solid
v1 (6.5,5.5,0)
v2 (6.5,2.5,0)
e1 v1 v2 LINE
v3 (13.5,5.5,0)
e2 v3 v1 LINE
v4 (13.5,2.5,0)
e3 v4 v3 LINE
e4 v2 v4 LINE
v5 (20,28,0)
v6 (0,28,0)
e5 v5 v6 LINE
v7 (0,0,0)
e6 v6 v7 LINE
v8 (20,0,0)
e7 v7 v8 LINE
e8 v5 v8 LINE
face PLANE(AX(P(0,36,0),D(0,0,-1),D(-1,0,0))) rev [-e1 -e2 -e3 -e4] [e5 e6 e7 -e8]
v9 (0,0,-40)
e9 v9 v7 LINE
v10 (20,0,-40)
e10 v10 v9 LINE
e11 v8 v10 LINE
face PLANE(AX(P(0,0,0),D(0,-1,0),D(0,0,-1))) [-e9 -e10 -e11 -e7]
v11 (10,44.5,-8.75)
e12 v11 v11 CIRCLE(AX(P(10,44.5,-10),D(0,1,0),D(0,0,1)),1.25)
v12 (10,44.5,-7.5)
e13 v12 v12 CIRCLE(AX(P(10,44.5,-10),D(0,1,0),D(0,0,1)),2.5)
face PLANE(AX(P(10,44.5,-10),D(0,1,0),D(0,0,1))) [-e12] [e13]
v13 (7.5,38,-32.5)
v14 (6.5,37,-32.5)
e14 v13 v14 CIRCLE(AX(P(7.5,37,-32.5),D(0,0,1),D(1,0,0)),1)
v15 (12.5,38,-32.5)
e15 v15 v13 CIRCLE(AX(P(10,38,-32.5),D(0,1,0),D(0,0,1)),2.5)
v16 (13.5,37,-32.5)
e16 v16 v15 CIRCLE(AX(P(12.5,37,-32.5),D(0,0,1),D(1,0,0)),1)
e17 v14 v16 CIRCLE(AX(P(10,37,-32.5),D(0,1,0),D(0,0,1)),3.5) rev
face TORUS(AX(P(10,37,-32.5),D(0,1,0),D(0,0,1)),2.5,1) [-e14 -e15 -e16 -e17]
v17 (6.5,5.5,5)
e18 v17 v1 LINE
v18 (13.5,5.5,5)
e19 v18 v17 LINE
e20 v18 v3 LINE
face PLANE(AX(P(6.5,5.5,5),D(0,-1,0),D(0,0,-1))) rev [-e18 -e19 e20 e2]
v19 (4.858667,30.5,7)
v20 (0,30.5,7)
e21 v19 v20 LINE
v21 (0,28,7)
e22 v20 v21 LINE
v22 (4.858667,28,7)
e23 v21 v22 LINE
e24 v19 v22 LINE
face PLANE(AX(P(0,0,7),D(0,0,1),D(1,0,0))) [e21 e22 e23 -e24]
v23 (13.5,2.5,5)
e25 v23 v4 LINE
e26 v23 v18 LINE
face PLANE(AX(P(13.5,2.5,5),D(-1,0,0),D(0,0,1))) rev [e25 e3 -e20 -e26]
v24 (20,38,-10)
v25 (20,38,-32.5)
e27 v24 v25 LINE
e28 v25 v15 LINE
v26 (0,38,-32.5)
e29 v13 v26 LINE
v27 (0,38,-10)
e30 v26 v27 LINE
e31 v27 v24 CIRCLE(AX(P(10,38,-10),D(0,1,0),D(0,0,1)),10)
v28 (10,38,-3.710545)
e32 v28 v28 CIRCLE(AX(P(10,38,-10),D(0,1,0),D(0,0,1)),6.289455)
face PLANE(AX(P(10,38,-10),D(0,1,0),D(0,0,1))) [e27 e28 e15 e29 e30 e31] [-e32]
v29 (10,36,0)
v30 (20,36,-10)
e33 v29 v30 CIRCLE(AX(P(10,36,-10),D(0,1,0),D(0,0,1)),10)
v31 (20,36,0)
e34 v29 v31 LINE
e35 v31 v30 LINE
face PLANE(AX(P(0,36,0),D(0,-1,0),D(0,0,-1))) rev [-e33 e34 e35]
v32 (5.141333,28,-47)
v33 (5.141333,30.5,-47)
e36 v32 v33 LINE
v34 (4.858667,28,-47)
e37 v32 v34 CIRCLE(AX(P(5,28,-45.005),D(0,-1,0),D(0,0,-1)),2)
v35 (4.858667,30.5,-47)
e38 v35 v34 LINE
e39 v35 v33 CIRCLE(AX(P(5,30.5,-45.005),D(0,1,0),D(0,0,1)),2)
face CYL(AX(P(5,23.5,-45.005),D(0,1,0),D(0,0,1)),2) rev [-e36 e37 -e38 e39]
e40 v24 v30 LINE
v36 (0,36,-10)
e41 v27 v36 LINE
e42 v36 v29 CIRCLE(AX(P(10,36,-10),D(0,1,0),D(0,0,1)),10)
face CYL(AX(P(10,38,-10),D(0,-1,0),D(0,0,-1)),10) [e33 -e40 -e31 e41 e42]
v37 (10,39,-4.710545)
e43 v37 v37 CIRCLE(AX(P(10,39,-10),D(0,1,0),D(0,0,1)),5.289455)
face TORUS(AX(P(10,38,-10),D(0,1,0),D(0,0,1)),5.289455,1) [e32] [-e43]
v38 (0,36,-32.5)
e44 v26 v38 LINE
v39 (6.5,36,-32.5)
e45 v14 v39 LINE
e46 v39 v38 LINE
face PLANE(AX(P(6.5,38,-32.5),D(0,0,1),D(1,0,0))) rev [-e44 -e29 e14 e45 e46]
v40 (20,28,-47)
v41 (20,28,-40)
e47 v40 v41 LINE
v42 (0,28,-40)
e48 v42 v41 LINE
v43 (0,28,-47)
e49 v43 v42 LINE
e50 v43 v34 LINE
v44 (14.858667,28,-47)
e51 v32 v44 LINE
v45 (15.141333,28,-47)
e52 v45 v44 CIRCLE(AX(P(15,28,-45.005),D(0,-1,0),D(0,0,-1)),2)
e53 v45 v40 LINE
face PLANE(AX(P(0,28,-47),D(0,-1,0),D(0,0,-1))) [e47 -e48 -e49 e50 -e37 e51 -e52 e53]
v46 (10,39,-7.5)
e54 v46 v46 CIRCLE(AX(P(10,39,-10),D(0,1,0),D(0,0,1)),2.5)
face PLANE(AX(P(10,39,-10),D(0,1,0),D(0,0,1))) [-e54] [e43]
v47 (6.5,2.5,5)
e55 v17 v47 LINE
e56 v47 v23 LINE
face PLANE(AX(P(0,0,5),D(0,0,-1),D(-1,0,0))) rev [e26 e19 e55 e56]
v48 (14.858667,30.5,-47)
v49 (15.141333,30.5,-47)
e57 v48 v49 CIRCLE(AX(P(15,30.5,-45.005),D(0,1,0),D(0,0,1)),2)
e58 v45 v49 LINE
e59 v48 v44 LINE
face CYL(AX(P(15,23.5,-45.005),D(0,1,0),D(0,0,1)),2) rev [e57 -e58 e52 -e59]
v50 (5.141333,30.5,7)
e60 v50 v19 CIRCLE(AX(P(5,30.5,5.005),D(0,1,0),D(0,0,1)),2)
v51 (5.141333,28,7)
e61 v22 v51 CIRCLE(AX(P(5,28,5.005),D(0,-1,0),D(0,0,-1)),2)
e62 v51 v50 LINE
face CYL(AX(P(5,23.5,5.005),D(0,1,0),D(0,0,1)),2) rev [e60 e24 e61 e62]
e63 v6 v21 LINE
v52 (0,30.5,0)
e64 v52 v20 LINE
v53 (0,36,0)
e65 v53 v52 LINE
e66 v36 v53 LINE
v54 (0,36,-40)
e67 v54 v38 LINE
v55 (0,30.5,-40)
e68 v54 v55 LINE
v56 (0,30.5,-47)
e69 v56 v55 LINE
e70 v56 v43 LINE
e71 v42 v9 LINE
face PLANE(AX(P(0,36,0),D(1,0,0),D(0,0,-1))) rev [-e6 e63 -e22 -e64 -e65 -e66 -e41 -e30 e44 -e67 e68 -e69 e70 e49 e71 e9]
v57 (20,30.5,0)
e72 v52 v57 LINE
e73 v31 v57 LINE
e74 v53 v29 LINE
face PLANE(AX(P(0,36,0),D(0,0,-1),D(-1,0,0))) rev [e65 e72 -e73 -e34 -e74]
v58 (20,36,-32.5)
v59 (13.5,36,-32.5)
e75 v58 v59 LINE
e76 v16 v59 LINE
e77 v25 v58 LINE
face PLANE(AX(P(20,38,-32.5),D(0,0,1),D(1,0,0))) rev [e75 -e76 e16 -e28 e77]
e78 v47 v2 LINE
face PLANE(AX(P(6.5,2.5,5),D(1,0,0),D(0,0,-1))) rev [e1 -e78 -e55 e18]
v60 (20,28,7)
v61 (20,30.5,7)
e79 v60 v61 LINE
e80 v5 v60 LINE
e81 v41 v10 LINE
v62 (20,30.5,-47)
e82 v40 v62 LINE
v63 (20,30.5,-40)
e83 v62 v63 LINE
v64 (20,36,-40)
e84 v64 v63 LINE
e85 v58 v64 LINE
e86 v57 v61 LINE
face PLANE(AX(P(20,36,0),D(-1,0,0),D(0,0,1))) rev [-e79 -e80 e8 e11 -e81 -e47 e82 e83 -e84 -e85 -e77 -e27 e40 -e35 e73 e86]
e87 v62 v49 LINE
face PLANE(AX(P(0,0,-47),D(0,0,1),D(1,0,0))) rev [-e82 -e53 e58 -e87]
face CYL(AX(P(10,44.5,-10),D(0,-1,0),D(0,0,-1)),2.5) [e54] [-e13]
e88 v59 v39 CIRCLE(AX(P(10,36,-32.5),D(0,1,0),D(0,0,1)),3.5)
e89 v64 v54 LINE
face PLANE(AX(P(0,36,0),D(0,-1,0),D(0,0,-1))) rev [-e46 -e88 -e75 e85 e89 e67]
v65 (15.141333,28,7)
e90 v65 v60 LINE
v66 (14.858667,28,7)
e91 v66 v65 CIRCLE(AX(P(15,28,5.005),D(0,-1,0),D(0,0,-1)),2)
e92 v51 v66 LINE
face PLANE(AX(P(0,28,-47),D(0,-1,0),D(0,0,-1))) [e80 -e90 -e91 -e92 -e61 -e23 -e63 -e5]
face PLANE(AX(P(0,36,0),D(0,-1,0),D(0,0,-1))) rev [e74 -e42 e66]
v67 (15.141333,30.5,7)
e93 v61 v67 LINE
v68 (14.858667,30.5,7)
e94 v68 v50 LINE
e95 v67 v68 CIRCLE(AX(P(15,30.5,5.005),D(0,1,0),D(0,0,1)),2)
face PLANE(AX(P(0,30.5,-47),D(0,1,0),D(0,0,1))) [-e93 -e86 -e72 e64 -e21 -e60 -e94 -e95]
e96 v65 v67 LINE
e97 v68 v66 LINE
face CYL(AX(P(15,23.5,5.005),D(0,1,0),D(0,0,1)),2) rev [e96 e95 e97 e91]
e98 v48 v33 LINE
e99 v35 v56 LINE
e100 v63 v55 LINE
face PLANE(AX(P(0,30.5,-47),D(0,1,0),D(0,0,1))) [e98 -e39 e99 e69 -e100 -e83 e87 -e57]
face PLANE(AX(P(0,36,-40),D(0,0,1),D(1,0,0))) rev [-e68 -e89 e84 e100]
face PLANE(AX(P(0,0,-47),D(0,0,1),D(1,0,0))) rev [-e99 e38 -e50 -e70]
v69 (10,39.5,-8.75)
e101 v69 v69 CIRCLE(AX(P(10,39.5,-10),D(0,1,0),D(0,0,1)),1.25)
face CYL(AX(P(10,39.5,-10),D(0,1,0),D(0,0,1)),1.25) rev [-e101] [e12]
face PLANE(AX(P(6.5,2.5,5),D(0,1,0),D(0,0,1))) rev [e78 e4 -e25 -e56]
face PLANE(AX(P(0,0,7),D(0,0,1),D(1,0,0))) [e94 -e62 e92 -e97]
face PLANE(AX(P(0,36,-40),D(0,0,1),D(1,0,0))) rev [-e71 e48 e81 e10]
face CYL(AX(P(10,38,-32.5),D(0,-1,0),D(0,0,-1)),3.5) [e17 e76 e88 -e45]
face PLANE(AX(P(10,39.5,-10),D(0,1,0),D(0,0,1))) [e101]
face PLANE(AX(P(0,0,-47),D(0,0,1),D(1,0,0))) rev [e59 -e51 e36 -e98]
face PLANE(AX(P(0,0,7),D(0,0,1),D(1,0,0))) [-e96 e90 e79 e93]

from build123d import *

# Parameters (mm, degrees)
SKETCH1_W                = 20
SKETCH1_H                = 40
BOSS_EXTRUDE1_DEPTH      = 36
SKETCH2_W                = 7
SKETCH2_H                = 3
BOSS_EXTRUDE2_DEPTH      = 5
SKETCH3_R                = 2.5
BOSS_EXTRUDE3_DEPTH      = 8.5
BOSS_EXTRUDE4_DEPTH      = 7
BOSS_EXTRUDE4_DEPTH_BACK = 47
SKETCH4_W                = 20
SKETCH4_H                = 2.5
SKETCH5_R                = 2
CUT_EXTRUDE1_DEPTH       = 7
BOSS_EXTRUDE5_DEPTH      = 2
SKETCH7_R                = 6.289454611
BOSS_EXTRUDE6_DEPTH      = 1
FILLET1_R                = 1
FILLET2_R                = 1
SKETCH8_R                = 1.25
CUT_EXTRUDE2_DEPTH       = 5


with BuildPart() as part:
    # Sketch1 → Boss-Extrude1 (new body)
    with BuildSketch(Plane(origin=(0, 0, 0), x_dir=(1, 0, 0), z_dir=(0, 1, 0))):
        with Locations((10, 20)):
            Rectangle(SKETCH1_W, SKETCH1_H)
    extrude(amount=BOSS_EXTRUDE1_DEPTH)

    # Sketch2 → Boss-Extrude2 (add)
    with BuildSketch(Plane.XY):
        with Locations((10, 4)):
            Rectangle(SKETCH2_W, SKETCH2_H)
    extrude(amount=BOSS_EXTRUDE2_DEPTH)

    # Sketch3 → Boss-Extrude3 (add)
    with BuildSketch(Plane(origin=(0, 36, 0), x_dir=(1, 0, 0), z_dir=(0, 1, 0))):
        with Locations(Location((10, 10, 0), (0, 0, 90))):
            Circle(SKETCH3_R)
    extrude(amount=BOSS_EXTRUDE3_DEPTH)

    # Sketch4 → Boss-Extrude4 (add, two sides: drawn at the far end of the back side and taken through both)
    with BuildSketch(Plane.XY.offset(-BOSS_EXTRUDE4_DEPTH_BACK)):
        with Locations((10, 29.25)):
            Rectangle(SKETCH4_W, SKETCH4_H)
    extrude(amount=BOSS_EXTRUDE4_DEPTH + BOSS_EXTRUDE4_DEPTH_BACK)

    # Sketch5 → Cut-Extrude1 (cut)
    with BuildSketch(Plane(origin=(0, 30.5, 0), x_dir=(1, 0, 0), z_dir=(0, 1, 0))):
        with Locations((15, 45.005)):
            Circle(SKETCH5_R)
        with Locations((5, 45.005)):
            Circle(SKETCH5_R)
        with Locations((15, -5.005)):
            Circle(SKETCH5_R)
        with Locations((5, -5.005)):
            Circle(SKETCH5_R)
    extrude(amount=-CUT_EXTRUDE1_DEPTH, mode=Mode.SUBTRACT)

    # Sketch6 → Boss-Extrude5 (add)
    with BuildSketch(Plane(origin=(0, 36, 0), x_dir=(1, 0, 0), z_dir=(0, 1, 0))):
        with BuildLine():
            Line((20, 32.5), (13.5, 32.5))
            ThreePointArc((13.5, 32.5), (10, 36), (6.5, 32.5))
            Line((6.5, 32.5), (0, 32.5))
            Line((0, 32.5), (0, 10))
            ThreePointArc((0, 10), (10, 0), (20, 10))
            Line((20, 10), (20, 32.5))
        make_face()
    extrude(amount=BOSS_EXTRUDE5_DEPTH)

    # Sketch7 → Boss-Extrude6 (add)
    with BuildSketch(Plane(origin=(0, 38, 0), x_dir=(1, 0, 0), z_dir=(0, 1, 0))):
        with Locations(Location((10, 10, 0), (0, 0, 270))):
            Circle(SKETCH7_R)
    extrude(amount=BOSS_EXTRUDE6_DEPTH)

    # Fillet1
    fillet1_edges = [part.edges().sort_by_distance(p)[0] for p in [
        (10, 39, -16.289454611),
    ]]
    fillet(fillet1_edges, radius=FILLET1_R - 0.0001)  # a hair under: the kernel refuses the full size

    # Fillet2
    fillet2_edges = [part.edges().sort_by_distance(p)[0] for p in [
        (10, 38, -36),
    ]]
    fillet(fillet2_edges, radius=FILLET2_R)

    # Sketch8 → Cut-Extrude2 (cut)
    with BuildSketch(Plane(origin=(0, 44.5, 0), x_dir=(1, 0, 0), z_dir=(0, 1, 0))):
        with Locations(Location((10, 10, 0), (0, 0, 270))):
            Circle(SKETCH8_R)
    extrude(amount=-CUT_EXTRUDE2_DEPTH, mode=Mode.SUBTRACT)


solid = part.part
